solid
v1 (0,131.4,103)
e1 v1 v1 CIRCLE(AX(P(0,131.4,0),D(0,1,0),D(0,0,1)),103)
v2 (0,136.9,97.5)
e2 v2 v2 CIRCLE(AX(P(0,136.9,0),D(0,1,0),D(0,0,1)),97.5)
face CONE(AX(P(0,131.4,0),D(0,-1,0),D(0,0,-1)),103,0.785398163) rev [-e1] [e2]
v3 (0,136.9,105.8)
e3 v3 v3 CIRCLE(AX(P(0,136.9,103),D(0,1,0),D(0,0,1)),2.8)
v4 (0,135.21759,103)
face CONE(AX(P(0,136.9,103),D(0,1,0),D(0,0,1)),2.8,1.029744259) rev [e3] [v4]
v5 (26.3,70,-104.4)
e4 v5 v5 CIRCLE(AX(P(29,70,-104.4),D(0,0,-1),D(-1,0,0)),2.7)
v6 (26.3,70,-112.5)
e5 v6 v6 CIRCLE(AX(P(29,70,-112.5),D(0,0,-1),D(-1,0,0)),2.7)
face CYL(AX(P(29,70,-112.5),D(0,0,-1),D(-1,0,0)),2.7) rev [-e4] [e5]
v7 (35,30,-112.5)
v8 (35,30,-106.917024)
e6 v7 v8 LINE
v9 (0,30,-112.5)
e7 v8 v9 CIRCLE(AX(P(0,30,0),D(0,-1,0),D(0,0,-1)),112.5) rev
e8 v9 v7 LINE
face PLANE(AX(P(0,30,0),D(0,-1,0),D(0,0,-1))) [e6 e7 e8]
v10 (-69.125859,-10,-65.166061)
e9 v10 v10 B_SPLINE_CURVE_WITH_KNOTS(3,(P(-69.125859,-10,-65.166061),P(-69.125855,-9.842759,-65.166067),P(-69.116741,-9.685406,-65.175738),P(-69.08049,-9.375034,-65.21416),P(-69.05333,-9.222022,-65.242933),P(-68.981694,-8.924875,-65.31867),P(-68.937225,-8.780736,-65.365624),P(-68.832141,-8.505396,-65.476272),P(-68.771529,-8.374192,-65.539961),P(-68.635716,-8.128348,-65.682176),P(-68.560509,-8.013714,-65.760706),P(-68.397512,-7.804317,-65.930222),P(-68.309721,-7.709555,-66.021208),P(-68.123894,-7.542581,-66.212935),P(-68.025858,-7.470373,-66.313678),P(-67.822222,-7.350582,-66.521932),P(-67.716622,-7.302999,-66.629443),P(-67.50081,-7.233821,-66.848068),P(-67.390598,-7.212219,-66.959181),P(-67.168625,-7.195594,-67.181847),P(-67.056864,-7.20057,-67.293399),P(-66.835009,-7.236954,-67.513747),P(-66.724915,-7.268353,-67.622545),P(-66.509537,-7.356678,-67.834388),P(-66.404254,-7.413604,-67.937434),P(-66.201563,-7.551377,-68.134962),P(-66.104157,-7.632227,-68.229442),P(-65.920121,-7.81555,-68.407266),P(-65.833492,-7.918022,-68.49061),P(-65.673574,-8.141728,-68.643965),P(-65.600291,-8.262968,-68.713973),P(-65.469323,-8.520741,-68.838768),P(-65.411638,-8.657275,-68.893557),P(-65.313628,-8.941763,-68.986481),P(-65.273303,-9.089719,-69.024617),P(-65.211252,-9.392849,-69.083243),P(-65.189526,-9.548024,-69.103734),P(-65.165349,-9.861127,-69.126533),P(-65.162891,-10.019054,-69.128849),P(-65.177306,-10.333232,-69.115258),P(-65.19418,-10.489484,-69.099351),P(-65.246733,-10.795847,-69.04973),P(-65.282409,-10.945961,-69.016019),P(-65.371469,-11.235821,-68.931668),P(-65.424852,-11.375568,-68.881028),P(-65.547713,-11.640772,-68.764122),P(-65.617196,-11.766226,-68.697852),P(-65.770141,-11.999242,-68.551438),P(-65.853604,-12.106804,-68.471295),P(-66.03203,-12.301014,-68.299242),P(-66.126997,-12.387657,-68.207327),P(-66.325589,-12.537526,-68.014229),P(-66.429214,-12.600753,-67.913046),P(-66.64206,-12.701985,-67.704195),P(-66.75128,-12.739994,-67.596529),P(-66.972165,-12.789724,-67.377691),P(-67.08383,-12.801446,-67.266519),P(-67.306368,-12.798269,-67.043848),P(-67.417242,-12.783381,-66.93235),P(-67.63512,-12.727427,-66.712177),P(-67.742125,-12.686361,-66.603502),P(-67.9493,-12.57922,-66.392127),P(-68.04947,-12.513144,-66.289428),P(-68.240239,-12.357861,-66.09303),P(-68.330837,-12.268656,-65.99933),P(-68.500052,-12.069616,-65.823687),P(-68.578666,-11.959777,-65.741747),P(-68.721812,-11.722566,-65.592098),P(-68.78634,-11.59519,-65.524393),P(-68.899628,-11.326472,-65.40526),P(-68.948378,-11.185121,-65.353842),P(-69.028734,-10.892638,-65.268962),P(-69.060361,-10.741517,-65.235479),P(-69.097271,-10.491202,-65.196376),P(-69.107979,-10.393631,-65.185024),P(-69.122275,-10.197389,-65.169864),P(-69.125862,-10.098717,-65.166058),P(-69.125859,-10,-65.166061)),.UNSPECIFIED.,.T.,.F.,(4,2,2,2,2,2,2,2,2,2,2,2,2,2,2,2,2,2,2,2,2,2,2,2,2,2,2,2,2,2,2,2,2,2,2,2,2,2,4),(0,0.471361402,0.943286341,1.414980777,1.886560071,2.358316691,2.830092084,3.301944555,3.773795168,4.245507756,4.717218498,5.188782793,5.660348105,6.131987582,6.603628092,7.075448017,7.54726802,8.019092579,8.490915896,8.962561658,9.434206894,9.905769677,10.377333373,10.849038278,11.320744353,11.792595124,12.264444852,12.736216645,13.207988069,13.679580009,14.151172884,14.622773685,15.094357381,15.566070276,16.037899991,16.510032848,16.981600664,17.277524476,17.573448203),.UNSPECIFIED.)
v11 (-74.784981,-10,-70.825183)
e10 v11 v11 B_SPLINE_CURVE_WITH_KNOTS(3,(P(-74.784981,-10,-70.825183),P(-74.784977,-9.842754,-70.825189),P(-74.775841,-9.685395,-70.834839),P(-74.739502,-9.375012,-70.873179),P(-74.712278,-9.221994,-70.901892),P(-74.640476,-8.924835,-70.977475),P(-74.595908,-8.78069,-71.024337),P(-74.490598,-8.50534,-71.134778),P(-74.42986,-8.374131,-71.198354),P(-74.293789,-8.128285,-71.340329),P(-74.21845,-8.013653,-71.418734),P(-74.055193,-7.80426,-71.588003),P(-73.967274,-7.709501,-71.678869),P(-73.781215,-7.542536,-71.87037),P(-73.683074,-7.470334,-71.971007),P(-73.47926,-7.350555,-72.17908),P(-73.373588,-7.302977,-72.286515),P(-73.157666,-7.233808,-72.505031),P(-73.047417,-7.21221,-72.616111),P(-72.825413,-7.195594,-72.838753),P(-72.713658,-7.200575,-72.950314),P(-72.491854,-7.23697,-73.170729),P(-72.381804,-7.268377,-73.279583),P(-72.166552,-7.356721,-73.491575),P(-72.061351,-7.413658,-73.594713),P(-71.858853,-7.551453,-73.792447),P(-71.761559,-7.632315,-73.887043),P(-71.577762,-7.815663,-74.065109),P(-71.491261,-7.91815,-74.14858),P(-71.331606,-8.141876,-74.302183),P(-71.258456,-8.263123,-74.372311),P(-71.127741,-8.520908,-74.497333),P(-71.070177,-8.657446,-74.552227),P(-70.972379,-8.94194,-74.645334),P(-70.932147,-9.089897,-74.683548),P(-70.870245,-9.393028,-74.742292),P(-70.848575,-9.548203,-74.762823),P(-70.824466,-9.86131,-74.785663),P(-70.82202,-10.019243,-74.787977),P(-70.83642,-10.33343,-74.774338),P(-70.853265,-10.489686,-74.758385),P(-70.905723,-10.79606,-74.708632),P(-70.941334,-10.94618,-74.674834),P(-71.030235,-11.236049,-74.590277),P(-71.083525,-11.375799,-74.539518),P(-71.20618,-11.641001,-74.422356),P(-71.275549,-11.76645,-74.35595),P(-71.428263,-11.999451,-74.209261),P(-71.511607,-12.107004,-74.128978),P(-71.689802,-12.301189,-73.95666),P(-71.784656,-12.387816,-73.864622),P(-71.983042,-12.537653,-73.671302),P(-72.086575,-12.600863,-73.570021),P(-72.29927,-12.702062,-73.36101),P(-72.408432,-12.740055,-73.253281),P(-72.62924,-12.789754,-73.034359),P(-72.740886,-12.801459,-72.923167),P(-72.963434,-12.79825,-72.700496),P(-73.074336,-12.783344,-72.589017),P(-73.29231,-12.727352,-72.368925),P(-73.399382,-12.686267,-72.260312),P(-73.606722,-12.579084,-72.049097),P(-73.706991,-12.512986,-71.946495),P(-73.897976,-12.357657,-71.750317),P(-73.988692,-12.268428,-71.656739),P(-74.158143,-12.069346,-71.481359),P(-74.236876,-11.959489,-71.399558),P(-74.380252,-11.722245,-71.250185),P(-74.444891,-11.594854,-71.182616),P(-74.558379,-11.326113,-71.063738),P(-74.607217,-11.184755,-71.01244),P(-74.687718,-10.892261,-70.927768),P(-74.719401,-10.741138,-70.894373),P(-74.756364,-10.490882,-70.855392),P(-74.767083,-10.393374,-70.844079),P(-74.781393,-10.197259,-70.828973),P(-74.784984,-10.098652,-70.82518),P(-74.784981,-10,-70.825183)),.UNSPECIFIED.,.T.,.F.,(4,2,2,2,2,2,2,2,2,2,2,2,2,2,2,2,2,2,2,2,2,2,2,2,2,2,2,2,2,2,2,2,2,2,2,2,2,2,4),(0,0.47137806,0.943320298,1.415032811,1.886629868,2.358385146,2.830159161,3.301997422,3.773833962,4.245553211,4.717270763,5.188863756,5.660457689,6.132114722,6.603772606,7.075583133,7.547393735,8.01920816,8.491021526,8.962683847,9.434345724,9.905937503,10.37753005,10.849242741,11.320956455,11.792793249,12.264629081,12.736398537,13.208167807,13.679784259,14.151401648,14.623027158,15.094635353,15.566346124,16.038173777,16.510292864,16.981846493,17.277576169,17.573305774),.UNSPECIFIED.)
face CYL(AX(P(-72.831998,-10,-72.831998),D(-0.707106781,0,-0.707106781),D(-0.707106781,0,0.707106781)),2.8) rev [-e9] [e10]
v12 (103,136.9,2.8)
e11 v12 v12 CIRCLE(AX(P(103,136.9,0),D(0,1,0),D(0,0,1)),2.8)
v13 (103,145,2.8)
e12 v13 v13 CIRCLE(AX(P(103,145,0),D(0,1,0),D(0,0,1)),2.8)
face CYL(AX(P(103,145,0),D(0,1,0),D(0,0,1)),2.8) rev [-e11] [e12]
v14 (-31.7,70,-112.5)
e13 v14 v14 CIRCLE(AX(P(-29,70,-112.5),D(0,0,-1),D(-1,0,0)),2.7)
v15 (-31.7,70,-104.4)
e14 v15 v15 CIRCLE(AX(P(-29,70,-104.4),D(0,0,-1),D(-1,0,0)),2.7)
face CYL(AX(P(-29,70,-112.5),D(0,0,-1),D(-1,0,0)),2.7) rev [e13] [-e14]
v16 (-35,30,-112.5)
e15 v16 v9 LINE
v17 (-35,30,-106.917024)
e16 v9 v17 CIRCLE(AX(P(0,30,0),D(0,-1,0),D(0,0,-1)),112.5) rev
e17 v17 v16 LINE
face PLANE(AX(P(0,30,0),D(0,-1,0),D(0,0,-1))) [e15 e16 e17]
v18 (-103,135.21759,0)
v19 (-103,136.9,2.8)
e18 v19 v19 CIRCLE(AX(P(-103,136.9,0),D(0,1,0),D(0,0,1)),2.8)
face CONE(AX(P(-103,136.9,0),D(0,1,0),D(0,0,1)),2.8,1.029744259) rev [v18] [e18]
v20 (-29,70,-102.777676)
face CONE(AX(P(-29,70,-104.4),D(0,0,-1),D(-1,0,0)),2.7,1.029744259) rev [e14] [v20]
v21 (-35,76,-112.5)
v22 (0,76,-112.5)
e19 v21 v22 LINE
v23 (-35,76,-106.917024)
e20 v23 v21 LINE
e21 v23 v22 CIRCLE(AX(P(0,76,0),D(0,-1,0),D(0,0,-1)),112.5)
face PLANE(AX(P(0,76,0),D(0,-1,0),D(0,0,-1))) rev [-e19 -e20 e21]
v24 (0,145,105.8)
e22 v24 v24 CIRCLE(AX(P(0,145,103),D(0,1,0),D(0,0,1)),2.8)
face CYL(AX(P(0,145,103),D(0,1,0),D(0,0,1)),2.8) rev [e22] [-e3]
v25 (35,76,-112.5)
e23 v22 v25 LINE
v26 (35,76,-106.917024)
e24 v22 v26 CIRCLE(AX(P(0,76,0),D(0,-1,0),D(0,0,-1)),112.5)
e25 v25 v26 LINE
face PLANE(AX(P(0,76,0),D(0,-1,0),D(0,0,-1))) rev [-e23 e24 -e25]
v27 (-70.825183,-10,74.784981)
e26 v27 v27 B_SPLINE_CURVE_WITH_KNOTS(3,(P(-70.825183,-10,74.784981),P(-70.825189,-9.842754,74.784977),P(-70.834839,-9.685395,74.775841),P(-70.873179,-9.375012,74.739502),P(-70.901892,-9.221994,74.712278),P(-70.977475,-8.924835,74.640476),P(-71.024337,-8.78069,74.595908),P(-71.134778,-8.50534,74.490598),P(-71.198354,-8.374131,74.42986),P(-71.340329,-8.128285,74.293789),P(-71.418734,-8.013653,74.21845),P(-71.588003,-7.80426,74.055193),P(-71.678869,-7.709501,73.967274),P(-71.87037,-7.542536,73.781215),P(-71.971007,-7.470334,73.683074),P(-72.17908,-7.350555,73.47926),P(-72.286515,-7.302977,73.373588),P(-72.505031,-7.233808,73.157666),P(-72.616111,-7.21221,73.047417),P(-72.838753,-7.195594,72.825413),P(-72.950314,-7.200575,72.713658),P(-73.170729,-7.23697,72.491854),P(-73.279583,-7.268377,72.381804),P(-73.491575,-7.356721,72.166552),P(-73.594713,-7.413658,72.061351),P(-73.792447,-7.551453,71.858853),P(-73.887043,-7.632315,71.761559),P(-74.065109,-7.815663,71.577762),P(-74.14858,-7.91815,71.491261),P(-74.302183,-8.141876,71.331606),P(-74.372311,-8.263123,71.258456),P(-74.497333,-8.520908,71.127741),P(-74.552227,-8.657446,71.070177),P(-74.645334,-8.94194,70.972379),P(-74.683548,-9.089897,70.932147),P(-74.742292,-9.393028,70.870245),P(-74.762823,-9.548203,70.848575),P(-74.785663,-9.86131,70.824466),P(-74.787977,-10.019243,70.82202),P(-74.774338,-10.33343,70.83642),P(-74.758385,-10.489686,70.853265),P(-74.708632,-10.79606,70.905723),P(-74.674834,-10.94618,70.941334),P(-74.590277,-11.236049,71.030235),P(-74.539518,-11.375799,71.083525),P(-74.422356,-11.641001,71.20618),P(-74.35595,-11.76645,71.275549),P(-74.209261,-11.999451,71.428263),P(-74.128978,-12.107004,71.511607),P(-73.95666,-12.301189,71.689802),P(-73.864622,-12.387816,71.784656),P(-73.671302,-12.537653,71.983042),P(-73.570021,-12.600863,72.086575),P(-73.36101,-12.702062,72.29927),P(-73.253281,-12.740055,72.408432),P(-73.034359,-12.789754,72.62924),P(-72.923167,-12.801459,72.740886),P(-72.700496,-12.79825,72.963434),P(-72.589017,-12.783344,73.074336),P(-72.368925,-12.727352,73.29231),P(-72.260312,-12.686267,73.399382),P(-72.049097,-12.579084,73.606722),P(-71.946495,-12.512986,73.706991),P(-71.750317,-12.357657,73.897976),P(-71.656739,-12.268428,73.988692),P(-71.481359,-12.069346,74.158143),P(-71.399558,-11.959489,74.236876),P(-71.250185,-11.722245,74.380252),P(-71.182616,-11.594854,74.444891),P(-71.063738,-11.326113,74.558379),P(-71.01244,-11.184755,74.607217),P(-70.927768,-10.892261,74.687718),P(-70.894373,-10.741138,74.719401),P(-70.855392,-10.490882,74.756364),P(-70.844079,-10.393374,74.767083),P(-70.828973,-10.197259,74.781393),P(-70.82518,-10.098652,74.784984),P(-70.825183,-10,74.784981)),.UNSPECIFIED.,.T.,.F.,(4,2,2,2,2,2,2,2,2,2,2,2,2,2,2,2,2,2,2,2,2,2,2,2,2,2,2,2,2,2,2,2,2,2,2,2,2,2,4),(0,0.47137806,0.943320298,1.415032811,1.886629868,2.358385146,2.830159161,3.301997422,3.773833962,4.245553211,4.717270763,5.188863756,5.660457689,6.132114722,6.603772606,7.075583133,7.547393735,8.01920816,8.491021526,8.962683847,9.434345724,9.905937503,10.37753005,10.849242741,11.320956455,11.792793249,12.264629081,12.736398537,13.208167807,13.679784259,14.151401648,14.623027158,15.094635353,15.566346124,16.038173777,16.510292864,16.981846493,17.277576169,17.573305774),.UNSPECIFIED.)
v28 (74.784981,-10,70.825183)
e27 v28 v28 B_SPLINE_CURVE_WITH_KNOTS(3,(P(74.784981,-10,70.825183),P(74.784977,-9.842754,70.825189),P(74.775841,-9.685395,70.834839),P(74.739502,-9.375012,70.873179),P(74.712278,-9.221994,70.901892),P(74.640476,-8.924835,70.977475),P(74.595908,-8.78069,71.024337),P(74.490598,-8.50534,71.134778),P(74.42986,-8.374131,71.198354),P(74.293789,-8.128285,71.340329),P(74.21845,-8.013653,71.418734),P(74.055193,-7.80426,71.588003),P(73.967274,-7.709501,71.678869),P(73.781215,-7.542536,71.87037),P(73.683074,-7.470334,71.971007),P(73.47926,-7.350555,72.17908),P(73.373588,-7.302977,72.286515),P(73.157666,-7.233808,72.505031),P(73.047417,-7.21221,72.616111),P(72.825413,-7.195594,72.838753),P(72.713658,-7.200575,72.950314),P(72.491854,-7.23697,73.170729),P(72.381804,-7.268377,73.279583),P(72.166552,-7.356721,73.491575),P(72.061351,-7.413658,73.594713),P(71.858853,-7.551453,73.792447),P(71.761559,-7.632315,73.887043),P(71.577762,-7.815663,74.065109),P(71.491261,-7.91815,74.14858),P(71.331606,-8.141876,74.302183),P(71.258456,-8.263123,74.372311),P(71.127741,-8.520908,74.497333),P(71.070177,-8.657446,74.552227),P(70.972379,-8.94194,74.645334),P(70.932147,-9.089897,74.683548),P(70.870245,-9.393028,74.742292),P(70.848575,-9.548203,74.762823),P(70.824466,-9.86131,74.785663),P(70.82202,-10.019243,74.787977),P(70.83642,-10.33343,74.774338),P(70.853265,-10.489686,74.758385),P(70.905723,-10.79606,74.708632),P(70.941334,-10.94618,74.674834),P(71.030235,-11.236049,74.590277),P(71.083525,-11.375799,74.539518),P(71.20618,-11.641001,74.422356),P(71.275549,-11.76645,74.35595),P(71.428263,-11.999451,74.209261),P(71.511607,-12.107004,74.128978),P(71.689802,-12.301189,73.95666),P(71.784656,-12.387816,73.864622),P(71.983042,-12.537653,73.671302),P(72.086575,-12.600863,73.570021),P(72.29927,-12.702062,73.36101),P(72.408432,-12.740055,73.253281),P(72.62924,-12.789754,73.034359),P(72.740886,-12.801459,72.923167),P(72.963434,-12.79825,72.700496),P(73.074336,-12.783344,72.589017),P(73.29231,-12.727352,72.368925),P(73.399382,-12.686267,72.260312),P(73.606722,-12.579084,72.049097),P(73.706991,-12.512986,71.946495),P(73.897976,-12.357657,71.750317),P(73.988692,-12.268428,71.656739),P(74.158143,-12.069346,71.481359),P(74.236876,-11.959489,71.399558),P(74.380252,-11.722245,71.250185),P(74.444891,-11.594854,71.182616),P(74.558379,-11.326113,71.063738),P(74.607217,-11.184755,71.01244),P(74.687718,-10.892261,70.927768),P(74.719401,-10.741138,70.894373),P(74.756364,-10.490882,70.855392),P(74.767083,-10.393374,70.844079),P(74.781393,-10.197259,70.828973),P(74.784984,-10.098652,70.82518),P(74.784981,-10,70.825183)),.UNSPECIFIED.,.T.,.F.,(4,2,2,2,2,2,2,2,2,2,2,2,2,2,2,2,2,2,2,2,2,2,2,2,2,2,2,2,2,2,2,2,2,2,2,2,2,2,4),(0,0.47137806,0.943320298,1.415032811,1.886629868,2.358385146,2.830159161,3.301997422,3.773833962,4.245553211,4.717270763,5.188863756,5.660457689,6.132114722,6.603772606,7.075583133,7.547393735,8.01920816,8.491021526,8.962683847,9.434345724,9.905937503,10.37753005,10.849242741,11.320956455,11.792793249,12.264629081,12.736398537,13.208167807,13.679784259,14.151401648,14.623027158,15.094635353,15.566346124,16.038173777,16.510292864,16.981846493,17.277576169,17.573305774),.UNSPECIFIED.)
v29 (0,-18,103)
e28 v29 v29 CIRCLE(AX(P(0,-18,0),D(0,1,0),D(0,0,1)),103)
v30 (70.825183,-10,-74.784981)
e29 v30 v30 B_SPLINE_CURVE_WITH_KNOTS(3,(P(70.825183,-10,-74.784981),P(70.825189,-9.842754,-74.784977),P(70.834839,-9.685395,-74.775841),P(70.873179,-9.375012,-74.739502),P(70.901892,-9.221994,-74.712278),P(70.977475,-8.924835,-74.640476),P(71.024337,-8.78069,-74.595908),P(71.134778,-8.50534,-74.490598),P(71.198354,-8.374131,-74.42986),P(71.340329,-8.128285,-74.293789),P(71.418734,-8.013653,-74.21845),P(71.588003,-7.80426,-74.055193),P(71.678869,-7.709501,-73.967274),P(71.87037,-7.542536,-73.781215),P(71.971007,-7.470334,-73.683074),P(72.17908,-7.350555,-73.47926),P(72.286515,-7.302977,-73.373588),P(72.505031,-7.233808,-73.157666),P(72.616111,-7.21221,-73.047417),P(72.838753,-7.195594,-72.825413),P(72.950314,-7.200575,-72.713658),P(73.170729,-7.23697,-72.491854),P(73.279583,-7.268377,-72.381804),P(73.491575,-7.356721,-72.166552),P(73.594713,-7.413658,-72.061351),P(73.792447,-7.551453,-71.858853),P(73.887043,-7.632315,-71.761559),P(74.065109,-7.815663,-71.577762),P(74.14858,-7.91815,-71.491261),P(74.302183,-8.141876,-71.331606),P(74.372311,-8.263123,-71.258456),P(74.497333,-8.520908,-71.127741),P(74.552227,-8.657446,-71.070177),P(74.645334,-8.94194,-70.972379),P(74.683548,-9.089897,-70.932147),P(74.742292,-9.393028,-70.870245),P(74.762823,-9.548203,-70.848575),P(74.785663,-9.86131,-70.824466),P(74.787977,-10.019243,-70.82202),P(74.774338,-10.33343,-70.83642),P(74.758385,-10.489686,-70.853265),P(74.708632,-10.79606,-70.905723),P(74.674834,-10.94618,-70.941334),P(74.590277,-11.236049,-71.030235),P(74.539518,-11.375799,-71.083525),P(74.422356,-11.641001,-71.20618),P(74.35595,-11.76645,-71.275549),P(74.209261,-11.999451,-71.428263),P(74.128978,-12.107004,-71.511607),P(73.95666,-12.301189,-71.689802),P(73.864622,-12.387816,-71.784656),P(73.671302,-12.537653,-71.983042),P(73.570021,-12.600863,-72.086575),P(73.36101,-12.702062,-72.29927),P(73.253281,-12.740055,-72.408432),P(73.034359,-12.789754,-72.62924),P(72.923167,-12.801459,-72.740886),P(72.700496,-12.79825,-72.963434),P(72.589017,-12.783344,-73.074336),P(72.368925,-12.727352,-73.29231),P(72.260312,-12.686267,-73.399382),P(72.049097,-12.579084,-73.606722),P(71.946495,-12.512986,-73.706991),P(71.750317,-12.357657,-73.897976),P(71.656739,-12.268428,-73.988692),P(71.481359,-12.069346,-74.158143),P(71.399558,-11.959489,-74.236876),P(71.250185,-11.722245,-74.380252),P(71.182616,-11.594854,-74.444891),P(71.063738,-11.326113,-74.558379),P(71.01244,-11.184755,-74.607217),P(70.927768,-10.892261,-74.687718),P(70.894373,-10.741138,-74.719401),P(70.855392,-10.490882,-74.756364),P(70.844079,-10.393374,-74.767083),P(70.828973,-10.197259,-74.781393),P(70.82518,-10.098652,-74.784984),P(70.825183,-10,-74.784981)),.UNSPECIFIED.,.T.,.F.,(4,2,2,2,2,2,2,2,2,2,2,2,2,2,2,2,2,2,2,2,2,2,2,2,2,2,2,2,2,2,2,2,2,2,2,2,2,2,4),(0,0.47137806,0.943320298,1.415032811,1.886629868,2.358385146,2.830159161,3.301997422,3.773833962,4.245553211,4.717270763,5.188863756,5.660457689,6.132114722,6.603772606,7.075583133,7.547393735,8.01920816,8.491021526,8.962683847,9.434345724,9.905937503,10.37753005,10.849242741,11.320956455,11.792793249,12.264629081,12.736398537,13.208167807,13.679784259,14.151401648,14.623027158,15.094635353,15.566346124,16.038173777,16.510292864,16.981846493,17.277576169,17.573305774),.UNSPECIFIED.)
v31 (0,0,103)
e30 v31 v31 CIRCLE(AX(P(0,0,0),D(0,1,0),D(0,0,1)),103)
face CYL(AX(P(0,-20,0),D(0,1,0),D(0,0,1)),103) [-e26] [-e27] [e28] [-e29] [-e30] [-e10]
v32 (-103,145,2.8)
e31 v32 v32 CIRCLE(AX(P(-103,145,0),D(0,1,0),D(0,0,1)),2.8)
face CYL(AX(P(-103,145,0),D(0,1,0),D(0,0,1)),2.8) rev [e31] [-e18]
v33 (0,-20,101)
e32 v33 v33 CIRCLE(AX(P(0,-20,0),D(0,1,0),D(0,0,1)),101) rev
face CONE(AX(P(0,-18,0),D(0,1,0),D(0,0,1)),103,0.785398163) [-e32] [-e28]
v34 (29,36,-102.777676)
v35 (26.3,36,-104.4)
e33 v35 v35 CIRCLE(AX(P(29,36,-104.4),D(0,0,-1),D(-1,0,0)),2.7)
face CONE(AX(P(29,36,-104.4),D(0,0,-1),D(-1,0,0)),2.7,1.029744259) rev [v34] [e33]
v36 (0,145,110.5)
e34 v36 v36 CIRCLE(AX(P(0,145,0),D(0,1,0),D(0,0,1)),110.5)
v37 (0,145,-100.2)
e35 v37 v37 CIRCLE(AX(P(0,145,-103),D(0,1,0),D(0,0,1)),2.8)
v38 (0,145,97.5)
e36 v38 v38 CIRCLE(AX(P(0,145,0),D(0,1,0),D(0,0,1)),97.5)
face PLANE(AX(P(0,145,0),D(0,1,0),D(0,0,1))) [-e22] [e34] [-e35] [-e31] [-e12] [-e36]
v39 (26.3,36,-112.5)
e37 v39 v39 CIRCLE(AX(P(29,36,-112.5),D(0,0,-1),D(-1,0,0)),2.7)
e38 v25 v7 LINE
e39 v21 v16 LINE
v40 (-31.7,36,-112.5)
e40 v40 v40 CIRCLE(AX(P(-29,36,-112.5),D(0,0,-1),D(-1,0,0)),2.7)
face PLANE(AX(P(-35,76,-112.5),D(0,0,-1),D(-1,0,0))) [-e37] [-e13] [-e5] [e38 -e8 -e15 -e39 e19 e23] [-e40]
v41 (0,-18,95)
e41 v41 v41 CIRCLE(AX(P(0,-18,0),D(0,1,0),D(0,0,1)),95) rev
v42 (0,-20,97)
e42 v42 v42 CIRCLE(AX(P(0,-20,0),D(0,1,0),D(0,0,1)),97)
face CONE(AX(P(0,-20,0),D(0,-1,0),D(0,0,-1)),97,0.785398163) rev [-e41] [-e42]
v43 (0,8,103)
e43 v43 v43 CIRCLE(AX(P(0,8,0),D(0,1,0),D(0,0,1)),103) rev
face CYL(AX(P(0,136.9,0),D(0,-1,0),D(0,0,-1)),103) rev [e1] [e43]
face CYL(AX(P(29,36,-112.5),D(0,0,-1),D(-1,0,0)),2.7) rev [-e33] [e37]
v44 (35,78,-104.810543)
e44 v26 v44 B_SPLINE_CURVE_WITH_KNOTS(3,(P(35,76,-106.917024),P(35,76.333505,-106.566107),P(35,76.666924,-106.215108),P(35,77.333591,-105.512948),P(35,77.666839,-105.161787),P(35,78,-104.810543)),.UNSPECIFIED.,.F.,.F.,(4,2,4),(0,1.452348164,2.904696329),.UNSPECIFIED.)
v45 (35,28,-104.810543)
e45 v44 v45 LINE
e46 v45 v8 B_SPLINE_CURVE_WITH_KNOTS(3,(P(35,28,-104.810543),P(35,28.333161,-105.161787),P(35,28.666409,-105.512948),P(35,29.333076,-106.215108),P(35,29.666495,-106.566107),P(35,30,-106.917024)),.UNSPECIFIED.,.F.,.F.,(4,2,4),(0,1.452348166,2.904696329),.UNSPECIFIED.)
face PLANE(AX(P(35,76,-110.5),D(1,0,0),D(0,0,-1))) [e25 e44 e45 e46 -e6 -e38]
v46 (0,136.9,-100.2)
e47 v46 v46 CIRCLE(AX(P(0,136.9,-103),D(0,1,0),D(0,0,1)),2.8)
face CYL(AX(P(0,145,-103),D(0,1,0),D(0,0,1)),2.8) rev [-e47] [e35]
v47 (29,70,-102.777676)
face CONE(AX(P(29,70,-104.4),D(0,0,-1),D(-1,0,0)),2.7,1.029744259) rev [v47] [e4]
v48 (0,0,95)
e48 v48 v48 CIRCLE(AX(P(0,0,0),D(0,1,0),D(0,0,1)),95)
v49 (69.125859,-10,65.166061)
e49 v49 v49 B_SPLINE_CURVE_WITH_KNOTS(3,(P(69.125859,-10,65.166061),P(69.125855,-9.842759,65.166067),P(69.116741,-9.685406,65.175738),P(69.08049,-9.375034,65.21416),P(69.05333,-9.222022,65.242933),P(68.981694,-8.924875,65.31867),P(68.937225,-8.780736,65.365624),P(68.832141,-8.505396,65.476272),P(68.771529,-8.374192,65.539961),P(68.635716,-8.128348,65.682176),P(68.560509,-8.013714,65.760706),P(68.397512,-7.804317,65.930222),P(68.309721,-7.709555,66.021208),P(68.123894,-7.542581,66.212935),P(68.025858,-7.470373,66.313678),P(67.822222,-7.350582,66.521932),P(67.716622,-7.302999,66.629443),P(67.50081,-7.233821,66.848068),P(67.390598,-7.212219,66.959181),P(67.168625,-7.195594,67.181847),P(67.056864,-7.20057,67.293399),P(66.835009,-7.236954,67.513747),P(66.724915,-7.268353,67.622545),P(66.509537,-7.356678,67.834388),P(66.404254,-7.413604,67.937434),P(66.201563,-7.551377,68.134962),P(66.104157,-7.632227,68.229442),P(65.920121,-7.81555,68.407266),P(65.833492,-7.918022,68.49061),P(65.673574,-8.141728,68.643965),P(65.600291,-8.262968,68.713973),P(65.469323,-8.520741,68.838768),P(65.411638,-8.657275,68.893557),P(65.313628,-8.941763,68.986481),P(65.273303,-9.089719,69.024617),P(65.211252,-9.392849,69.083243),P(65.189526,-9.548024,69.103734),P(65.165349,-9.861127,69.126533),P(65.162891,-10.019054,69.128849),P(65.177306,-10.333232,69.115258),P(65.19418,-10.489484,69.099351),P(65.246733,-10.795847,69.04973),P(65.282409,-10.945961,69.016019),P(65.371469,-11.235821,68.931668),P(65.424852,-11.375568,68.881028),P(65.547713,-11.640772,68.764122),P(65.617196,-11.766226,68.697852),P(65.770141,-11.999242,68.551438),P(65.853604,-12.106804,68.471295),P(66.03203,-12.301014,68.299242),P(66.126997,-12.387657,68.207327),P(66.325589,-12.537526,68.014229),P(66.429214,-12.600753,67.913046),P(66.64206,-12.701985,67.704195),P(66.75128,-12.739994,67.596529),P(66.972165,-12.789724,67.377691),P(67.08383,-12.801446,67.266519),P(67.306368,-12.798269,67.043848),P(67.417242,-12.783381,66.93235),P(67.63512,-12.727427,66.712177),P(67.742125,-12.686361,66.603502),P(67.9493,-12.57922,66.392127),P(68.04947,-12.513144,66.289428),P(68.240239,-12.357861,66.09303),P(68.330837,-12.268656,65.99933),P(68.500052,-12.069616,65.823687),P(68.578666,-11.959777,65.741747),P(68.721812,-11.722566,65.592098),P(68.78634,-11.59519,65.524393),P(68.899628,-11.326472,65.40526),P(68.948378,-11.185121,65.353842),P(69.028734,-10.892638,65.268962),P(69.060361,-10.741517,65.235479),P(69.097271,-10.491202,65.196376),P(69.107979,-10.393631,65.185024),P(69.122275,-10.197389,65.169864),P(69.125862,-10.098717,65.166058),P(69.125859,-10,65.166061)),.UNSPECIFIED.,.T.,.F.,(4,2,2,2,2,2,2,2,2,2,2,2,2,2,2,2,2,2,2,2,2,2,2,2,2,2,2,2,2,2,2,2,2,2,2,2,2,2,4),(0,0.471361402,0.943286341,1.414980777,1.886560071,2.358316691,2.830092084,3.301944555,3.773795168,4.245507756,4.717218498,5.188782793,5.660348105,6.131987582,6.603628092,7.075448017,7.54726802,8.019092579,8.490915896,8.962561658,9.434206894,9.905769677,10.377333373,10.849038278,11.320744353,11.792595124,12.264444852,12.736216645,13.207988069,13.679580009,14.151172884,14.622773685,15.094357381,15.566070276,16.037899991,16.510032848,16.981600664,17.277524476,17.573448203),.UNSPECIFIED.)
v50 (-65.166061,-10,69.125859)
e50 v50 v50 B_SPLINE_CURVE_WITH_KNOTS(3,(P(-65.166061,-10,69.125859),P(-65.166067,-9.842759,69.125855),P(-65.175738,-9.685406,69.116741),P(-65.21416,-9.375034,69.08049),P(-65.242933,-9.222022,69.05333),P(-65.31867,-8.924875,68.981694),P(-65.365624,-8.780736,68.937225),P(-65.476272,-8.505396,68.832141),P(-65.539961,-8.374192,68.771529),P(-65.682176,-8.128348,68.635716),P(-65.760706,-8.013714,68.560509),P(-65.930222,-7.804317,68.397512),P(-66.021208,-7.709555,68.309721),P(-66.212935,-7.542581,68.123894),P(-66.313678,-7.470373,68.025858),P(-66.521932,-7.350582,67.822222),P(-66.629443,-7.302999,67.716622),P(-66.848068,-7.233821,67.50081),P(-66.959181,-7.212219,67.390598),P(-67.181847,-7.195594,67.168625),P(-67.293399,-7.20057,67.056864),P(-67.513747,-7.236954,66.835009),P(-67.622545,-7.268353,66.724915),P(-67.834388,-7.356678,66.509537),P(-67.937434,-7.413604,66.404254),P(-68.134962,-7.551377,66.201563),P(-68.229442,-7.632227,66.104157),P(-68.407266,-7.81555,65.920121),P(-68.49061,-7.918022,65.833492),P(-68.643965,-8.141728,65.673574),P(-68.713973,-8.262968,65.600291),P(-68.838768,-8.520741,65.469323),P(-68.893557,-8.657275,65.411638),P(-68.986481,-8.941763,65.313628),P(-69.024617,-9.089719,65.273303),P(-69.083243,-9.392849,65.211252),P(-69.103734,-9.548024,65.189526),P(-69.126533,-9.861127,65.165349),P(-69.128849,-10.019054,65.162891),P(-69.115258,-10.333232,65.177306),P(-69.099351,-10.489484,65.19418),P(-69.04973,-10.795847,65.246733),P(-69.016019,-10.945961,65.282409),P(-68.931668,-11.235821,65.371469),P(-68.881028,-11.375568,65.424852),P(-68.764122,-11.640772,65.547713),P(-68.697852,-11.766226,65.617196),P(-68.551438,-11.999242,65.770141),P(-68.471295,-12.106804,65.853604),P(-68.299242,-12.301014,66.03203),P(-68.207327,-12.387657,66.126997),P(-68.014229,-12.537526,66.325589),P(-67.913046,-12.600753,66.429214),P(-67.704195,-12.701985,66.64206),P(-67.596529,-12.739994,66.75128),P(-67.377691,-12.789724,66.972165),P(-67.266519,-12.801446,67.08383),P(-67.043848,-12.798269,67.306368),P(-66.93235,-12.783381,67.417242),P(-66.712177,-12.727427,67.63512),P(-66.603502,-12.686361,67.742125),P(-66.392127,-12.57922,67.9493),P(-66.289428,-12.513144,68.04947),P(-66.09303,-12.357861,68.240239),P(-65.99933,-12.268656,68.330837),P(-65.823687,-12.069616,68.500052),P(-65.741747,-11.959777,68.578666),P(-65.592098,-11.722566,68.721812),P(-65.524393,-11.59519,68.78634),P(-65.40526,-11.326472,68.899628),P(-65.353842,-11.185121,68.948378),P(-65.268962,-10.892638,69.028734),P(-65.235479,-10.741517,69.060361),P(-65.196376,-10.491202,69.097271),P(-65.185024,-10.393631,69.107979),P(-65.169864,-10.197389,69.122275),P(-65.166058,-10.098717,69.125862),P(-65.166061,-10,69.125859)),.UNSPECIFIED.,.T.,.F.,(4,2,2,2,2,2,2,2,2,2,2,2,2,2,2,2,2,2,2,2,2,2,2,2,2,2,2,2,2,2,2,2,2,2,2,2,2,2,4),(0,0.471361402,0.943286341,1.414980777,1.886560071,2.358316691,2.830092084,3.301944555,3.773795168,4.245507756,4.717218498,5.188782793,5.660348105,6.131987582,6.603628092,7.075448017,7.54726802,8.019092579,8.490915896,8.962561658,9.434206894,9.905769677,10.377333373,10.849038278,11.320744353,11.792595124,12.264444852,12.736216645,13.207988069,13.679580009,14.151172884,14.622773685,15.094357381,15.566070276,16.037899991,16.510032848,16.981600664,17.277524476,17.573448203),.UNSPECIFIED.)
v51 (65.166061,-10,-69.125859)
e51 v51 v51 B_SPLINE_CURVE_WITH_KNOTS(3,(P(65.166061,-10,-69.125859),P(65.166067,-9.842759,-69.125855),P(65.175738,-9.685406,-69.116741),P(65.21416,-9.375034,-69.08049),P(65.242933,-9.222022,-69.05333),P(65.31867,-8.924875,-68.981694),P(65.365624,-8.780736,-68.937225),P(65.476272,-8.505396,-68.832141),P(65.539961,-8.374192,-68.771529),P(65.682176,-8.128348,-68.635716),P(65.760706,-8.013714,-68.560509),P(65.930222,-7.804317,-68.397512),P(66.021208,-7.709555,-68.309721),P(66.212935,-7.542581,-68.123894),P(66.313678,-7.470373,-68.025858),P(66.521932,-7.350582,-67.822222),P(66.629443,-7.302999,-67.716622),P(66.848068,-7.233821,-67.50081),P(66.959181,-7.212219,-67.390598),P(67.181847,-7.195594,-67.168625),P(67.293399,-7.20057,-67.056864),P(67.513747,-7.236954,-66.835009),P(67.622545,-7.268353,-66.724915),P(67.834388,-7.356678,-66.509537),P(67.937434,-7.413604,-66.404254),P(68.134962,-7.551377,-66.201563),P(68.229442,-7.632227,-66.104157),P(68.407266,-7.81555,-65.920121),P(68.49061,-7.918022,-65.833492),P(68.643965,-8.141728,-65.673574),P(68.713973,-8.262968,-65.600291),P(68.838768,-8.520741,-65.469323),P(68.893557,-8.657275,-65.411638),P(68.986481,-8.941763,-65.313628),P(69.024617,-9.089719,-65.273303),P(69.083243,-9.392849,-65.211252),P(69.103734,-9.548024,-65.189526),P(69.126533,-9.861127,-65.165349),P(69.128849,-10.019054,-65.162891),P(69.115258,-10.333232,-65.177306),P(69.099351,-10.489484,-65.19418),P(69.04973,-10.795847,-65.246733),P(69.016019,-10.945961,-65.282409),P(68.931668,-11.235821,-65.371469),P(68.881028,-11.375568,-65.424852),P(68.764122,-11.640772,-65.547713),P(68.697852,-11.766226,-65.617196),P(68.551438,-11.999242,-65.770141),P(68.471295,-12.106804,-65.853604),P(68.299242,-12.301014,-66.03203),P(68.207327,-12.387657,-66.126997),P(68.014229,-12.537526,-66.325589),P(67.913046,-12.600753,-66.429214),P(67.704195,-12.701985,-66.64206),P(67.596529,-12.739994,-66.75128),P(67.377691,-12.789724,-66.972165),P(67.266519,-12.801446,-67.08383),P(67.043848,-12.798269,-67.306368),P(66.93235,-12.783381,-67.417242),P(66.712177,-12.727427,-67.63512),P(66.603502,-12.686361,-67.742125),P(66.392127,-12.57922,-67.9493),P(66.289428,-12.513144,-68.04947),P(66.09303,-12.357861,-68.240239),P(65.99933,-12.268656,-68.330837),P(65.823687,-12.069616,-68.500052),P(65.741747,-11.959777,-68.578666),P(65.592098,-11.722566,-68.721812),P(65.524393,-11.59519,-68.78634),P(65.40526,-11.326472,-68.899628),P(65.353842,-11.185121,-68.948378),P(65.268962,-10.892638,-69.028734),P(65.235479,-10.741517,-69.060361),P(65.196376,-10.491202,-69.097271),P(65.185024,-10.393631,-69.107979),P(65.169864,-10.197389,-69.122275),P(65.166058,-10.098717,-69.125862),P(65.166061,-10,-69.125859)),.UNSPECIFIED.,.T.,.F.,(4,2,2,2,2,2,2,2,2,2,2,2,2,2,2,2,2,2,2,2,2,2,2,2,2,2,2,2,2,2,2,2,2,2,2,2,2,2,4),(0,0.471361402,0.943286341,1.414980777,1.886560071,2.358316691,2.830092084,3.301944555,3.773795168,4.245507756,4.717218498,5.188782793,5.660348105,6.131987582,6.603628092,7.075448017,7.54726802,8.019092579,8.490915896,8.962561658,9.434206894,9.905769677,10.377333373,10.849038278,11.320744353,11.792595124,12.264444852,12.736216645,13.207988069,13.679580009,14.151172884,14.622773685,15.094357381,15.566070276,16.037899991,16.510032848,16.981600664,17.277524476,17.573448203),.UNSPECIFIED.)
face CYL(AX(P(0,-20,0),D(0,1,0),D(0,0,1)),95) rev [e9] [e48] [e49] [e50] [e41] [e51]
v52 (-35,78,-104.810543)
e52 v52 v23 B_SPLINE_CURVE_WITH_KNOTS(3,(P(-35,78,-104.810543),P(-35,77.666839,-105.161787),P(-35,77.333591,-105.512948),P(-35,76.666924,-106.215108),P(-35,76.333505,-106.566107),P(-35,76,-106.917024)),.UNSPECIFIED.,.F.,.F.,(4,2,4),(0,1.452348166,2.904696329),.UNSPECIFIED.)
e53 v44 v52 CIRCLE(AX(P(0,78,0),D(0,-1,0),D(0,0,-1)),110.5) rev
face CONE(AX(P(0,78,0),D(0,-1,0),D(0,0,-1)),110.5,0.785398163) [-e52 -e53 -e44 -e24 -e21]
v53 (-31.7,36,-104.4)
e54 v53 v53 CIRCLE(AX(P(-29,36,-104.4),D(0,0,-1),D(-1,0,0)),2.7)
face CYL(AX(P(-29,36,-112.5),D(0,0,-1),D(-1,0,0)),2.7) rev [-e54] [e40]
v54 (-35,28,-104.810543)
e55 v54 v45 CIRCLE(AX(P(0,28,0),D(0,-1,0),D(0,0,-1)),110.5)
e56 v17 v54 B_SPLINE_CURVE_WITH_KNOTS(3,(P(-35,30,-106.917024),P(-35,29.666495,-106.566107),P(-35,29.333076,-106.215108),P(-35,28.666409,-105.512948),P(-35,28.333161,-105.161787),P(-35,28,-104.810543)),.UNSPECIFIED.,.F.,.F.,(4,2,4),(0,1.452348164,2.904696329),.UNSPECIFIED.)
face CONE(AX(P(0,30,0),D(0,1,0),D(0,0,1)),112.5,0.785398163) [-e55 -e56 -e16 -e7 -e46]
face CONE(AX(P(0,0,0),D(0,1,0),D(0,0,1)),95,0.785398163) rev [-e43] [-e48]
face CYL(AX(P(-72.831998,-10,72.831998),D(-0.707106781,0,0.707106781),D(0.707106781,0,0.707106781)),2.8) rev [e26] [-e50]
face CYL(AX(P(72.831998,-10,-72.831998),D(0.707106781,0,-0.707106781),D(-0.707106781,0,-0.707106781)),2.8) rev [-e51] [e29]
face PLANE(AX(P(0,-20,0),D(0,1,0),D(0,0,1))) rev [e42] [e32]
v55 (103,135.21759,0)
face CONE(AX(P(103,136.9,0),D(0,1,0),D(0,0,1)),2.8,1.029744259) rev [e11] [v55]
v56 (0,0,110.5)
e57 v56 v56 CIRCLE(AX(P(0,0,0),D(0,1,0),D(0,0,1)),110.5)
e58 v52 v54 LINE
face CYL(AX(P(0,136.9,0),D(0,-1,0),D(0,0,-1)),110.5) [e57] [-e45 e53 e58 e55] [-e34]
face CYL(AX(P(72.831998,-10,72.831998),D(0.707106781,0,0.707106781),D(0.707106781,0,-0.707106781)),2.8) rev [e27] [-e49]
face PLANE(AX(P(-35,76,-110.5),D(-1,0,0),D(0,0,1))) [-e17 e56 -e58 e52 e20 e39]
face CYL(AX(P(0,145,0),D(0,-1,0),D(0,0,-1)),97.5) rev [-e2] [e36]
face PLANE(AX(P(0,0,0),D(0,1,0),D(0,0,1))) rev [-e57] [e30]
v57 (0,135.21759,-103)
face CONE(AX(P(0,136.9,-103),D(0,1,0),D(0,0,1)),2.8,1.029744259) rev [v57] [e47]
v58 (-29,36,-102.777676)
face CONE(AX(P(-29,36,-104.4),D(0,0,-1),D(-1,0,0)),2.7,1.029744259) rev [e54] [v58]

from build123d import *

# Parameters (mm, degrees)
SCHIZZO1_R                         = 110.5
SCHIZZO1_R_2                       = 103
ESTRUSIONE_ESTRUSIONE1_DEPTH       = 136.9
ESTRUSIONE_ESTRUSIONE2_DEPTH       = 10
ESTRUSIONE_ESTRUSIONE2_DEPTH_BACK  = 20
SCHIZZO1_3_R                       = 103
SCHIZZO1_3_R_2                     = 95
SMUSSO1_SIZE                       = 10
SMUSSO2_SIZE                       = 2
SCHIZZO2_R                         = 110.5
SCHIZZO2_R_2                       = 97.5
ESTRUSIONE_ESTRUSIONE3_DEPTH       = 8.1
SMUSSO3_SIZE                       = 5.5
FORO_PER_VITE_M4_1_D               = 5.6
FORO_PER_VITE_M4_1_DEPTH           = 8.1
FORO_PER_VITE_M4_1_TIP             = 1.682409733
FORO_PER_VITE_M4_2_D               = 5.6
FORO_PER_VITE_M4_2_DEPTH           = 8.1
FORO_PER_VITE_M4_2_TIP             = 1.682409733
FORO_PER_VITE_M4_2_ON_FACE_2_D     = 5.6
FORO_PER_VITE_M4_2_ON_FACE_2_DEPTH = 8.1
FORO_PER_VITE_M4_2_ON_FACE_2_TIP   = 1.682409733
FORO_PER_VITE_M4_2_ON_FACE_3_D     = 5.6
FORO_PER_VITE_M4_2_ON_FACE_3_DEPTH = 8.1
FORO_PER_VITE_M4_2_ON_FACE_3_TIP   = 1.682409733
FORO_PER_VITE_M4_2_ON_FACE_4_D     = 5.6
FORO_PER_VITE_M4_2_ON_FACE_4_DEPTH = 8.1
FORO_PER_VITE_M4_2_ON_FACE_4_TIP   = 1.682409733
ESTRUSIONE_ESTRUSIONE4_DEPTH       = 46
SMUSSO4_SIZE                       = 2


# Read off the part's stored shape, not the designer's step: Foro per Vite M4-3
# Some blends are built 0.0001 mm under size
with BuildPart() as part:
    # Schizzo1 → Estrusione-Estrusione1 (new body)
    with BuildSketch(Plane(origin=(0, 0, 0), x_dir=(1, 0, 0), z_dir=(0, 1, 0))):
        with Locations(Location((0, 0, 0), (0, 0, 270))):
            Circle(SCHIZZO1_R)
        with Locations(Location((0, 0, 0), (0, 0, 270))):
            Circle(SCHIZZO1_R_2, mode=Mode.SUBTRACT)
    extrude(amount=ESTRUSIONE_ESTRUSIONE1_DEPTH)

    # Schizzo1<3> → Estrusione-Estrusione2 (add, two sides: drawn at the far end of the back side and taken through both)
    with BuildSketch(Plane(origin=(0, 0, 0), x_dir=(1, 0, 0), z_dir=(0, 1, 0)).offset(-ESTRUSIONE_ESTRUSIONE2_DEPTH_BACK)):
        with Locations(Location((0, 0, 0), (0, 0, 270))):
            Circle(SCHIZZO1_3_R)
        with Locations(Location((0, 0, 0), (0, 0, 270))):
            Circle(SCHIZZO1_3_R_2, mode=Mode.SUBTRACT)
    extrude(amount=ESTRUSIONE_ESTRUSIONE2_DEPTH + ESTRUSIONE_ESTRUSIONE2_DEPTH_BACK)

    # Smusso1
    # the kernel refuses this chamfer: 10 mm, written as the material it takes off along each edge
    with BuildSketch(Plane(origin=(0, 10, 0), x_dir=(0, 0, 1), z_dir=(-1, 0, 0))) as smusso1_piece_1_section:
        Polygon((95 + SMUSSO1_SIZE, 0), (95, -SMUSSO1_SIZE), (95, 0), align=None)
    smusso1_piece_1 = revolve(axis=Axis((0, 10, 0), (0, 1, 0)), mode=Mode.PRIVATE)
    smusso1_piece_1 = smusso1_piece_1 & Plane(origin=(0, 4.08333284, 0), x_dir=(0, 0, 1), z_dir=(0, -1, 0)) * Cylinder(103, 420, mode=Mode.PRIVATE)
    add(smusso1_piece_1, mode=Mode.SUBTRACT)

    # Smusso2
    smusso2_edges = [part.edges().sort_by_distance(p)[0] for p in [
        (0, -20, -95),
        (0, -20, -103),
    ]]
    chamfer(smusso2_edges, length=SMUSSO2_SIZE)

    # Schizzo2 → Estrusione-Estrusione3 (add)
    with BuildSketch(Plane(origin=(0, 136.9, 0), x_dir=(1, 0, 0), z_dir=(0, 1, 0))):
        with Locations(Location((0, 0, 0), (0, 0, 270))):
            Circle(SCHIZZO2_R)
        with Locations(Location((0, 0, 0), (0, 0, 270))):
            Circle(SCHIZZO2_R_2, mode=Mode.SUBTRACT)
    extrude(amount=ESTRUSIONE_ESTRUSIONE3_DEPTH)

    # Smusso3
    smusso3_edges = [part.edges().sort_by_distance(p)[0] for p in [
        (0, 136.9, -103),
    ]]
    chamfer(smusso3_edges, length=SMUSSO3_SIZE - 0.0001)  # a hair under: the kernel refuses the full size

    # Foro per Vite M4-1
    with Locations(Plane(origin=(0, 145, 0), x_dir=(1, 0, 0), z_dir=(0, 1, 0))):
        with Locations((0, 103), (0, -103), (103, 0), (-103, 0)):
            Hole(FORO_PER_VITE_M4_1_D / 2, depth=FORO_PER_VITE_M4_1_DEPTH)
            with Locations((0, 0, -(FORO_PER_VITE_M4_1_DEPTH + FORO_PER_VITE_M4_1_TIP / 2))):  # 118° drill point
                Cone(0, FORO_PER_VITE_M4_1_D / 2, FORO_PER_VITE_M4_1_TIP, mode=Mode.SUBTRACT)

    # Foro per Vite M4-2
    with Locations(Plane(origin=(72.831998462, -10, -72.831998462), x_dir=(0.707106781187, 0, 0.707106781187), z_dir=(0.707106781187, 0, -0.707106781187))):
        with Locations((0, 0)):
            Hole(FORO_PER_VITE_M4_2_D / 2, depth=FORO_PER_VITE_M4_2_DEPTH)
            with Locations((0, 0, -(FORO_PER_VITE_M4_2_DEPTH + FORO_PER_VITE_M4_2_TIP / 2))):  # 118° drill point
                Cone(0, FORO_PER_VITE_M4_2_D / 2, FORO_PER_VITE_M4_2_TIP, mode=Mode.SUBTRACT)

    # Foro per Vite M4-2 on face 2
    with Locations(Plane(origin=(-72.831998462, -10, -72.831998462), x_dir=(-0.707106781187, 0, 0.707106781187), z_dir=(-0.707106781187, 0, -0.707106781187))):
        with Locations((0, 0)):
            Hole(FORO_PER_VITE_M4_2_ON_FACE_2_D / 2, depth=FORO_PER_VITE_M4_2_ON_FACE_2_DEPTH)
            with Locations((0, 0, -(FORO_PER_VITE_M4_2_ON_FACE_2_DEPTH + FORO_PER_VITE_M4_2_ON_FACE_2_TIP / 2))):  # 118° drill point
                Cone(0, FORO_PER_VITE_M4_2_ON_FACE_2_D / 2, FORO_PER_VITE_M4_2_ON_FACE_2_TIP, mode=Mode.SUBTRACT)

    # Foro per Vite M4-2 on face 3
    with Locations(Plane(origin=(-72.831998462, -10, 72.831998462), x_dir=(0.707106781187, 0, 0.707106781187), z_dir=(-0.707106781187, 0, 0.707106781187))):
        with Locations((0, 0)):
            Hole(FORO_PER_VITE_M4_2_ON_FACE_3_D / 2, depth=FORO_PER_VITE_M4_2_ON_FACE_3_DEPTH)
            with Locations((0, 0, -(FORO_PER_VITE_M4_2_ON_FACE_3_DEPTH + FORO_PER_VITE_M4_2_ON_FACE_3_TIP / 2))):  # 118° drill point
                Cone(0, FORO_PER_VITE_M4_2_ON_FACE_3_D / 2, FORO_PER_VITE_M4_2_ON_FACE_3_TIP, mode=Mode.SUBTRACT)

    # Foro per Vite M4-2 on face 4
    with Locations(Plane(origin=(72.831998462, -10, 72.831998462), x_dir=(0.707106781187, 0, -0.707106781187), z_dir=(0.707106781187, 0, 0.707106781187))):
        with Locations((0, 0)):
            Hole(FORO_PER_VITE_M4_2_ON_FACE_4_D / 2, depth=FORO_PER_VITE_M4_2_ON_FACE_4_DEPTH)
            with Locations((0, 0, -(FORO_PER_VITE_M4_2_ON_FACE_4_DEPTH + FORO_PER_VITE_M4_2_ON_FACE_4_TIP / 2))):  # 118° drill point
                Cone(0, FORO_PER_VITE_M4_2_ON_FACE_4_D / 2, FORO_PER_VITE_M4_2_ON_FACE_4_TIP, mode=Mode.SUBTRACT)

    # Schizzo7 → Estrusione-Estrusione4 (add)
    with BuildSketch(Plane.XZ.offset(-30)):
        with BuildLine():
            Line((-35, -104.810543363), (-35, -110.5))
            Line((-35, -110.5), (-35, -112.5))
            Line((-35, -112.5), (35, -112.5))
            Line((35, -112.5), (35, -110.5))
            Line((35, -110.5), (35, -104.810543363))
            ThreePointArc((35, -104.810543363), (0, -110.5), (-35, -104.810543363))
        make_face()
    extrude(amount=-ESTRUSIONE_ESTRUSIONE4_DEPTH)

    # Smusso4
    smusso4_edges = [part.edges().sort_by_distance(p)[0] for p in [
        (0, 76, -110.5),
        (0, 30, -110.5),
    ]]
    chamfer(smusso4_edges, length=SMUSSO4_SIZE - 0.0001)  # a hair under: the kernel refuses the full size

    # Foro per Vite M4-3 outline → Foro per Vite M4-3 (revolve, cut)
    with BuildSketch(Plane(origin=(-29, 36, 0), x_dir=(1, 0, 0), z_dir=(0, -1, 0))):
        Polygon((2.7, -104.4), (0, -102.777676329), (0, -112.5), (2.7, -112.5), align=None)
    revolve(axis=Axis((-29, 36, 0), (0, 0, 1)), mode=Mode.SUBTRACT)

    # Foro per Vite M4-3 2 outline → Foro per Vite M4-3 2 (revolve, cut)
    with BuildSketch(Plane(origin=(29, 70, 0), x_dir=(1, 0, 0), z_dir=(0, -1, 0))):
        Polygon((2.7, -104.4), (0, -102.777676329), (0, -112.5), (2.7, -112.5), align=None)
    revolve(axis=Axis((29, 70, 0), (0, 0, 1)), mode=Mode.SUBTRACT)

    # Foro per Vite M4-3 3 outline → Foro per Vite M4-3 3 (revolve, cut)
    with BuildSketch(Plane(origin=(-29, 70, 0), x_dir=(1, 0, 0), z_dir=(0, -1, 0))):
        Polygon((2.7, -104.4), (0, -102.777676329), (0, -112.5), (2.7, -112.5), align=None)
    revolve(axis=Axis((-29, 70, 0), (0, 0, 1)), mode=Mode.SUBTRACT)

    # Foro per Vite M4-3 4 outline → Foro per Vite M4-3 4 (revolve, cut)
    with BuildSketch(Plane(origin=(29, 36, 0), x_dir=(1, 0, 0), z_dir=(0, -1, 0))):
        Polygon((2.7, -104.4), (0, -102.777676329), (0, -112.5), (2.7, -112.5), align=None)
    revolve(axis=Axis((29, 36, 0), (0, 0, 1)), mode=Mode.SUBTRACT)


solid = part.part
